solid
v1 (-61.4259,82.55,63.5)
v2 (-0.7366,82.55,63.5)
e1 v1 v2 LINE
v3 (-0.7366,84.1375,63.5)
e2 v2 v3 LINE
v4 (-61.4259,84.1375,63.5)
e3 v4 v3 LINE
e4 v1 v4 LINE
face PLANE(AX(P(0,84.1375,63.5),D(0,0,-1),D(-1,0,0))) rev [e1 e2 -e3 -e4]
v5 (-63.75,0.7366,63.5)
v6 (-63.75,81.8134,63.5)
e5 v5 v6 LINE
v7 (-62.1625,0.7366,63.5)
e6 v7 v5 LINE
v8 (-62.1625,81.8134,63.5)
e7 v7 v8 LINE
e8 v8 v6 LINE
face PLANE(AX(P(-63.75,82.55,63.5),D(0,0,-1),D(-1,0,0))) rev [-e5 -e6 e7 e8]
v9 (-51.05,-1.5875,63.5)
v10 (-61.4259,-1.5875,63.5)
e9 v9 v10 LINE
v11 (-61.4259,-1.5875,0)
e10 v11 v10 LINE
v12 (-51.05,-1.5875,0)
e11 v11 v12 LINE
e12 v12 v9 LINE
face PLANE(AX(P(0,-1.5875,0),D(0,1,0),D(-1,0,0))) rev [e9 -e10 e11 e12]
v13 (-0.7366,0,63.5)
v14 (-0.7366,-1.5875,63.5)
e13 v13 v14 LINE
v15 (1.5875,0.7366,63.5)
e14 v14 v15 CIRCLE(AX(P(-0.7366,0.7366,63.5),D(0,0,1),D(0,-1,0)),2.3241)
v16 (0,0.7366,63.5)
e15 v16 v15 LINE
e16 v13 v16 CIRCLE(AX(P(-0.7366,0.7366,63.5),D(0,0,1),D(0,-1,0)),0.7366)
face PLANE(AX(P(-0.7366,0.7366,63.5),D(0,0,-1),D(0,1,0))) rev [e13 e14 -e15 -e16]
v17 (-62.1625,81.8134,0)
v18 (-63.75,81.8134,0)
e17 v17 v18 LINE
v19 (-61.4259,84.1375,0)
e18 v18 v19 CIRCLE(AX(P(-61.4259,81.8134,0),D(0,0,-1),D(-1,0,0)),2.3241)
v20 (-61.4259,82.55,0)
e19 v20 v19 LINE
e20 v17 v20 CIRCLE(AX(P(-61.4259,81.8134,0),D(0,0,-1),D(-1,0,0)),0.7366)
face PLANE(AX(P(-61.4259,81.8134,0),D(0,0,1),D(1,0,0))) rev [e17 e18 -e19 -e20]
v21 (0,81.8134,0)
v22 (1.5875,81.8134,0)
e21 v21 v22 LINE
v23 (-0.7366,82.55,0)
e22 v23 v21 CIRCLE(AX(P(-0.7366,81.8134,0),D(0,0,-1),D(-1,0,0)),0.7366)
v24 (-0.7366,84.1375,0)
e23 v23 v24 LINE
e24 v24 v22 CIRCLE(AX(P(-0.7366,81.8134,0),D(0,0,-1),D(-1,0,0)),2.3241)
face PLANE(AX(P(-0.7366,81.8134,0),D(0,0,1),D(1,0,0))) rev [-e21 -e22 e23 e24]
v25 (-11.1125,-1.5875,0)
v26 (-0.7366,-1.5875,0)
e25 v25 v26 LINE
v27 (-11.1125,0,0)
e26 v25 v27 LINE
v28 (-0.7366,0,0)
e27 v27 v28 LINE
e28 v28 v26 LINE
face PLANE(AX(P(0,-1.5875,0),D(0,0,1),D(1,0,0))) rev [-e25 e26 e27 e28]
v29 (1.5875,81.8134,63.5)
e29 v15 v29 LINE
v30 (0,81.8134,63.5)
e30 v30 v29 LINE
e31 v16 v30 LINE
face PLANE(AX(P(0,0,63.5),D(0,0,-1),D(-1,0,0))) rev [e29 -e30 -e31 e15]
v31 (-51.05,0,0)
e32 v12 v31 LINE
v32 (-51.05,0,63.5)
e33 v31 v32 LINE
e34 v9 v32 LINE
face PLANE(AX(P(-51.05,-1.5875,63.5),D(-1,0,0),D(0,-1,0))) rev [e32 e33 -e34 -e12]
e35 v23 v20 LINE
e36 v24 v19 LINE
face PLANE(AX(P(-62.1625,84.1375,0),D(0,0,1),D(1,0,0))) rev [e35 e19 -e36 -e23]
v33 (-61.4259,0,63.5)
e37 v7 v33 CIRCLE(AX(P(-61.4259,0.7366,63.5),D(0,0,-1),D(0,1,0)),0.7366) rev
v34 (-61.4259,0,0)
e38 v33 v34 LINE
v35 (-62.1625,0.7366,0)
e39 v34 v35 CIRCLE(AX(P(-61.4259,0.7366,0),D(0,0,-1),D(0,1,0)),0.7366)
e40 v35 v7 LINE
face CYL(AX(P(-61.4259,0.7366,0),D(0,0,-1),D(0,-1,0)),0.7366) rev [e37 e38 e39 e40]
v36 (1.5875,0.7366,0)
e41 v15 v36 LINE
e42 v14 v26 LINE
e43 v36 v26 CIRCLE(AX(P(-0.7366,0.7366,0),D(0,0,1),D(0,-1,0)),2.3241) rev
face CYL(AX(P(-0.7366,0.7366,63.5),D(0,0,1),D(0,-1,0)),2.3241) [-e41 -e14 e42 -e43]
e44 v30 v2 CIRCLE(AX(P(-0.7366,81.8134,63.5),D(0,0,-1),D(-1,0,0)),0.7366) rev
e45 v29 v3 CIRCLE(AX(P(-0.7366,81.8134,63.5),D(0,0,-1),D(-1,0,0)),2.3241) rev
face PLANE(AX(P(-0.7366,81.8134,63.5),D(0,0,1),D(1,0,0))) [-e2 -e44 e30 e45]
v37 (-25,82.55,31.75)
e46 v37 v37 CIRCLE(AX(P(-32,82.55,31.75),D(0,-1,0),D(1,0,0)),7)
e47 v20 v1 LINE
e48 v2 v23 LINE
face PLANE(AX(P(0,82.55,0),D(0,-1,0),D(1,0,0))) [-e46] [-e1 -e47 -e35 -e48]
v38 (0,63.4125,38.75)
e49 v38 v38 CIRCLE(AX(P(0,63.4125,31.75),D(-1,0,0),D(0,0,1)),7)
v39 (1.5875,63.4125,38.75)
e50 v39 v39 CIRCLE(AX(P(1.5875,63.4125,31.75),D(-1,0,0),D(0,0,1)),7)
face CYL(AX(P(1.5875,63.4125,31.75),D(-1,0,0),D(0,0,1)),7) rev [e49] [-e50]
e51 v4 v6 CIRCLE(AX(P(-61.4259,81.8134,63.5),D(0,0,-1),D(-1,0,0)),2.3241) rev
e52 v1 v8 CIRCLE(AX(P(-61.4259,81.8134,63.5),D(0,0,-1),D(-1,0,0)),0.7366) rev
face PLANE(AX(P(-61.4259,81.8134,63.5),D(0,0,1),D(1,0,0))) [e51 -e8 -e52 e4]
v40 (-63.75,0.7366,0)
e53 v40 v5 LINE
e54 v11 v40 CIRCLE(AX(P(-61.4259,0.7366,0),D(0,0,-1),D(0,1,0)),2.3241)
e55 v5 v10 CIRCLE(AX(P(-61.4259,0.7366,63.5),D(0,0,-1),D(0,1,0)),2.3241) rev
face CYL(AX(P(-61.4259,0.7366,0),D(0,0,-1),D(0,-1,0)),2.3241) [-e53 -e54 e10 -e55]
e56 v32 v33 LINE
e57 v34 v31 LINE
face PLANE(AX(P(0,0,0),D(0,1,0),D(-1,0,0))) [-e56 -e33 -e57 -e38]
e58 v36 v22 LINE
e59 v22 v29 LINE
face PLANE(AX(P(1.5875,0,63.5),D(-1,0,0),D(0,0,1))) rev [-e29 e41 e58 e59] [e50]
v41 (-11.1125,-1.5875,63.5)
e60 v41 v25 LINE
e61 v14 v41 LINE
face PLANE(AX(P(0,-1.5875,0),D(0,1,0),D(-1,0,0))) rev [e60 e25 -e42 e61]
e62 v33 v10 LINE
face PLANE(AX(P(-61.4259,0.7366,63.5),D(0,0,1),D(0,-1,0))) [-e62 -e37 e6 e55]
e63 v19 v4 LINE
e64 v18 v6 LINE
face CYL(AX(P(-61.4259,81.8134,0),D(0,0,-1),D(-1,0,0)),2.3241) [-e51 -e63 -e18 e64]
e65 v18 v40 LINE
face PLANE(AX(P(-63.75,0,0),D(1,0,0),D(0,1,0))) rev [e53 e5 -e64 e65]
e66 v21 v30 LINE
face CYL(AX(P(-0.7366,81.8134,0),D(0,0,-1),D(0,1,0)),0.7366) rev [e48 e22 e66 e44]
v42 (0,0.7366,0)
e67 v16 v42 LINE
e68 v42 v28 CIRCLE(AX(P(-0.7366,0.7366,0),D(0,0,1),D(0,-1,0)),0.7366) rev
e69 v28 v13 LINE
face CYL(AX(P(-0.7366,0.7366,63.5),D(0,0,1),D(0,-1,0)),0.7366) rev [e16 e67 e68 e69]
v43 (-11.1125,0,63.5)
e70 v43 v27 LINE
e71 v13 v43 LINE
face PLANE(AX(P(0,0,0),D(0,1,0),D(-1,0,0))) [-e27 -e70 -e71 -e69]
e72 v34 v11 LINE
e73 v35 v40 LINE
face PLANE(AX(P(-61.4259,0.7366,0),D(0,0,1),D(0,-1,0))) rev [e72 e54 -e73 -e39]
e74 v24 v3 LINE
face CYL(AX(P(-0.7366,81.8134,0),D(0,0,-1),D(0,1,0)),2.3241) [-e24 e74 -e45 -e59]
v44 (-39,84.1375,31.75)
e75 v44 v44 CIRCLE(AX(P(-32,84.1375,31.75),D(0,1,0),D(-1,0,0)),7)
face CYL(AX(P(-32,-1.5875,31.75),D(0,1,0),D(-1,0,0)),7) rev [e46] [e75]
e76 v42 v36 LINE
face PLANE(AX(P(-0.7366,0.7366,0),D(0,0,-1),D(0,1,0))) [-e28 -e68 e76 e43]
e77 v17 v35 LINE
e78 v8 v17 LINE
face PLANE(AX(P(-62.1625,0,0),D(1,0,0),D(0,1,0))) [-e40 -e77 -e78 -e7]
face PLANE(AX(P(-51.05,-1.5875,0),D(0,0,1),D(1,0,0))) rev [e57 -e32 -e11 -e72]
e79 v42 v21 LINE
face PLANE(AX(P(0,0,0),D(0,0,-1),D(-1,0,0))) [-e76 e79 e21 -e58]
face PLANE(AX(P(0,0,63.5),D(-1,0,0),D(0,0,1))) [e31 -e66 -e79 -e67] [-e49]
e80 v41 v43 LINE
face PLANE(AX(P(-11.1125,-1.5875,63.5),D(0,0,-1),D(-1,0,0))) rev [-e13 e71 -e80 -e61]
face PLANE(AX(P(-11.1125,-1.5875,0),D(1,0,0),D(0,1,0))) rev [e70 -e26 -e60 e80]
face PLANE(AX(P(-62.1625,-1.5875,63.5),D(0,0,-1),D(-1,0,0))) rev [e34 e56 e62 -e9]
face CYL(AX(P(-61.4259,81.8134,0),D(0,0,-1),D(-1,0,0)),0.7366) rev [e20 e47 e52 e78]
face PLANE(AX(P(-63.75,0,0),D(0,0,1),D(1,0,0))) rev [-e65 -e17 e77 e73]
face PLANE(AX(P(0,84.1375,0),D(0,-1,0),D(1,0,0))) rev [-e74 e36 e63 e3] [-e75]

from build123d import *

# Parameters (mm, degrees)
SKETCH2_W                    = 1.5875
SKETCH2_H                    = 82.55
BASE_FLANGE1_DEPTH           = 63.5
EDGE_FLANGE1_STRIP_W         = 7.8232
EDGE_FLANGE1_STRIP_H         = 1.5875
EDGE_FLANGE1_STRIP_CUT_DEPTH = 63.5
EDGE_FLANGE1_DEPTH           = 63.5
SKETCH10_R                   = 7
CUT_EXTRUDE1_DEPTH           = 105.73891424
EDGE_FLANGE2_STRIP_W         = 7.8232
EDGE_FLANGE2_STRIP_H         = 1.5875
EDGE_FLANGE2_STRIP_CUT_DEPTH = 63.5
EDGE_FLANGE2_DEPTH           = 63.5
EDGE_FLANGE3_STRIP_W         = 7.8232
EDGE_FLANGE3_STRIP_H         = 1.5875
EDGE_FLANGE3_STRIP_CUT_DEPTH = 63.5
EDGE_FLANGE3_DEPTH           = 63.5
EDGE_FLANGE4_STRIP_W         = 7.8232
EDGE_FLANGE4_STRIP_H         = 1.5875
EDGE_FLANGE4_STRIP_CUT_DEPTH = 63.5
EDGE_FLANGE4_DEPTH           = 63.5
SKETCH20_R                   = 7
CUT_EXTRUDE2_DEPTH           = 125.278268888


# Sheet-metal steps are written as plain solids
with BuildPart() as part:
    # Sketch2 → Base-Flange1 (new body)
    with BuildSketch(Plane.XY):
        with Locations((0.79375, 41.275)):
            Rectangle(SKETCH2_W, SKETCH2_H)
    extrude(amount=BASE_FLANGE1_DEPTH)

    # Edge-Flange1 strip (across the edge) → Edge-Flange1 strip cut (cut)
    with BuildSketch(Plane(origin=(0, 0, 0), x_dir=(0, 1, 0), z_dir=(0, 0, 1))):
        with Locations((-3.175, -0.79375)):
            Rectangle(EDGE_FLANGE1_STRIP_W, EDGE_FLANGE1_STRIP_H)
    extrude(amount=EDGE_FLANGE1_STRIP_CUT_DEPTH, mode=Mode.SUBTRACT)

    # Edge-Flange1 section (across the edge) → Edge-Flange1 (add)
    with BuildSketch(Plane(origin=(0, 0, 0), x_dir=(0, 1, 0), z_dir=(0, 0, 1))):
        with BuildLine():
            Line((-1.5875, 0.7366), (-1.5875, 11.1125))
            Line((-1.5875, 11.1125), (0, 11.1125))
            Line((0, 11.1125), (0, 0.7366))
            ThreePointArc((0, 0.7366), (0.215745145, 0.215745145), (0.7366, 0))
            Line((0.7366, 0), (0.7366, -1.5875))
            ThreePointArc((0.7366, -1.5875), (-0.90678687, -0.90678687), (-1.5875, 0.7366))
        make_face()
    extrude(amount=EDGE_FLANGE1_DEPTH)

    # Sketch10 → Cut-Extrude1 (cut, through all)
    with BuildSketch(Plane.ZY):
        with Locations((31.75, 63.4125)):
            Circle(SKETCH10_R)
    extrude(amount=-CUT_EXTRUDE1_DEPTH, mode=Mode.SUBTRACT)

    # Edge-Flange2 strip (across the edge) → Edge-Flange2 strip cut (cut)
    with BuildSketch(Plane(origin=(0, 82.55, 63.5), x_dir=(0, -1, 0), z_dir=(0, 0, -1))):
        with Locations((-3.175, -0.79375)):
            Rectangle(EDGE_FLANGE2_STRIP_W, EDGE_FLANGE2_STRIP_H)
    extrude(amount=EDGE_FLANGE2_STRIP_CUT_DEPTH, mode=Mode.SUBTRACT)

    # Edge-Flange2 section (across the edge) → Edge-Flange2 (add)
    with BuildSketch(Plane(origin=(0, 82.55, 63.5), x_dir=(0, -1, 0), z_dir=(0, 0, -1))):
        with BuildLine():
            Line((-1.5875, 0.7366), (-1.5875, 62.162499944))
            Line((-1.5875, 62.162499944), (0, 62.162499944))
            Line((0, 62.162499944), (0, 0.7366))
            ThreePointArc((0, 0.7366), (0.215745145, 0.215745145), (0.7366, 0))
            Line((0.7366, 0), (0.7366, -1.5875))
            ThreePointArc((0.7366, -1.5875), (-0.90678687, -0.90678687), (-1.5875, 0.7366))
        make_face()
    extrude(amount=EDGE_FLANGE2_DEPTH)

    # Edge-Flange3 strip (across the edge) → Edge-Flange3 strip cut (cut)
    with BuildSketch(Plane(origin=(-62.162499944, 82.55, 63.5), x_dir=(1, 0, 0), z_dir=(0, 0, -1))):
        with Locations((-3.175, -0.79375)):
            Rectangle(EDGE_FLANGE3_STRIP_W, EDGE_FLANGE3_STRIP_H)
    extrude(amount=EDGE_FLANGE3_STRIP_CUT_DEPTH, mode=Mode.SUBTRACT)

    # Edge-Flange3 section (across the edge) → Edge-Flange3 (add)
    with BuildSketch(Plane(origin=(-62.162499944, 82.55, 63.5), x_dir=(1, 0, 0), z_dir=(0, 0, -1))):
        with BuildLine():
            Line((-1.5875, 0.7366), (-1.5875, 82.55))
            Line((-1.5875, 82.55), (0, 82.55))
            Line((0, 82.55), (0, 0.7366))
            ThreePointArc((0, 0.7366), (0.215745145, 0.215745145), (0.7366, 0))
            Line((0.7366, 0), (0.7366, -1.5875))
            ThreePointArc((0.7366, -1.5875), (-0.90678687, -0.90678687), (-1.5875, 0.7366))
        make_face()
    extrude(amount=EDGE_FLANGE3_DEPTH)

    # Edge-Flange4 strip (across the edge) → Edge-Flange4 strip cut (cut)
    with BuildSketch(Plane(origin=(-62.162499944, 0, 63.5), x_dir=(0, 1, 0), z_dir=(0, 0, -1))):
        with Locations((-3.175, -0.79375)):
            Rectangle(EDGE_FLANGE4_STRIP_W, EDGE_FLANGE4_STRIP_H)
    extrude(amount=EDGE_FLANGE4_STRIP_CUT_DEPTH, mode=Mode.SUBTRACT)

    # Edge-Flange4 section (across the edge) → Edge-Flange4 (add)
    with BuildSketch(Plane(origin=(-62.162499944, 0, 63.5), x_dir=(0, 1, 0), z_dir=(0, 0, -1))):
        with BuildLine():
            Line((-1.5875, 0.7366), (-1.5875, 11.1125))
            Line((-1.5875, 11.1125), (0, 11.1125))
            Line((0, 11.1125), (0, 0.7366))
            ThreePointArc((0, 0.7366), (0.215745145, 0.215745145), (0.7366, 0))
            Line((0.7366, 0), (0.7366, -1.5875))
            ThreePointArc((0.7366, -1.5875), (-0.90678687, -0.90678687), (-1.5875, 0.7366))
        make_face()
    extrude(amount=EDGE_FLANGE4_DEPTH)

    # Sketch20 → Cut-Extrude2 (cut, through all)
    with BuildSketch(Plane(origin=(0, 84.1375, 0), x_dir=(1, 0, 0), z_dir=(0, 1, 0))):
        with Locations(Location((-32, -31.75, 0), (0, 0, 180))):
            Circle(SKETCH20_R)
    extrude(amount=-CUT_EXTRUDE2_DEPTH, mode=Mode.SUBTRACT)


solid = part.part
